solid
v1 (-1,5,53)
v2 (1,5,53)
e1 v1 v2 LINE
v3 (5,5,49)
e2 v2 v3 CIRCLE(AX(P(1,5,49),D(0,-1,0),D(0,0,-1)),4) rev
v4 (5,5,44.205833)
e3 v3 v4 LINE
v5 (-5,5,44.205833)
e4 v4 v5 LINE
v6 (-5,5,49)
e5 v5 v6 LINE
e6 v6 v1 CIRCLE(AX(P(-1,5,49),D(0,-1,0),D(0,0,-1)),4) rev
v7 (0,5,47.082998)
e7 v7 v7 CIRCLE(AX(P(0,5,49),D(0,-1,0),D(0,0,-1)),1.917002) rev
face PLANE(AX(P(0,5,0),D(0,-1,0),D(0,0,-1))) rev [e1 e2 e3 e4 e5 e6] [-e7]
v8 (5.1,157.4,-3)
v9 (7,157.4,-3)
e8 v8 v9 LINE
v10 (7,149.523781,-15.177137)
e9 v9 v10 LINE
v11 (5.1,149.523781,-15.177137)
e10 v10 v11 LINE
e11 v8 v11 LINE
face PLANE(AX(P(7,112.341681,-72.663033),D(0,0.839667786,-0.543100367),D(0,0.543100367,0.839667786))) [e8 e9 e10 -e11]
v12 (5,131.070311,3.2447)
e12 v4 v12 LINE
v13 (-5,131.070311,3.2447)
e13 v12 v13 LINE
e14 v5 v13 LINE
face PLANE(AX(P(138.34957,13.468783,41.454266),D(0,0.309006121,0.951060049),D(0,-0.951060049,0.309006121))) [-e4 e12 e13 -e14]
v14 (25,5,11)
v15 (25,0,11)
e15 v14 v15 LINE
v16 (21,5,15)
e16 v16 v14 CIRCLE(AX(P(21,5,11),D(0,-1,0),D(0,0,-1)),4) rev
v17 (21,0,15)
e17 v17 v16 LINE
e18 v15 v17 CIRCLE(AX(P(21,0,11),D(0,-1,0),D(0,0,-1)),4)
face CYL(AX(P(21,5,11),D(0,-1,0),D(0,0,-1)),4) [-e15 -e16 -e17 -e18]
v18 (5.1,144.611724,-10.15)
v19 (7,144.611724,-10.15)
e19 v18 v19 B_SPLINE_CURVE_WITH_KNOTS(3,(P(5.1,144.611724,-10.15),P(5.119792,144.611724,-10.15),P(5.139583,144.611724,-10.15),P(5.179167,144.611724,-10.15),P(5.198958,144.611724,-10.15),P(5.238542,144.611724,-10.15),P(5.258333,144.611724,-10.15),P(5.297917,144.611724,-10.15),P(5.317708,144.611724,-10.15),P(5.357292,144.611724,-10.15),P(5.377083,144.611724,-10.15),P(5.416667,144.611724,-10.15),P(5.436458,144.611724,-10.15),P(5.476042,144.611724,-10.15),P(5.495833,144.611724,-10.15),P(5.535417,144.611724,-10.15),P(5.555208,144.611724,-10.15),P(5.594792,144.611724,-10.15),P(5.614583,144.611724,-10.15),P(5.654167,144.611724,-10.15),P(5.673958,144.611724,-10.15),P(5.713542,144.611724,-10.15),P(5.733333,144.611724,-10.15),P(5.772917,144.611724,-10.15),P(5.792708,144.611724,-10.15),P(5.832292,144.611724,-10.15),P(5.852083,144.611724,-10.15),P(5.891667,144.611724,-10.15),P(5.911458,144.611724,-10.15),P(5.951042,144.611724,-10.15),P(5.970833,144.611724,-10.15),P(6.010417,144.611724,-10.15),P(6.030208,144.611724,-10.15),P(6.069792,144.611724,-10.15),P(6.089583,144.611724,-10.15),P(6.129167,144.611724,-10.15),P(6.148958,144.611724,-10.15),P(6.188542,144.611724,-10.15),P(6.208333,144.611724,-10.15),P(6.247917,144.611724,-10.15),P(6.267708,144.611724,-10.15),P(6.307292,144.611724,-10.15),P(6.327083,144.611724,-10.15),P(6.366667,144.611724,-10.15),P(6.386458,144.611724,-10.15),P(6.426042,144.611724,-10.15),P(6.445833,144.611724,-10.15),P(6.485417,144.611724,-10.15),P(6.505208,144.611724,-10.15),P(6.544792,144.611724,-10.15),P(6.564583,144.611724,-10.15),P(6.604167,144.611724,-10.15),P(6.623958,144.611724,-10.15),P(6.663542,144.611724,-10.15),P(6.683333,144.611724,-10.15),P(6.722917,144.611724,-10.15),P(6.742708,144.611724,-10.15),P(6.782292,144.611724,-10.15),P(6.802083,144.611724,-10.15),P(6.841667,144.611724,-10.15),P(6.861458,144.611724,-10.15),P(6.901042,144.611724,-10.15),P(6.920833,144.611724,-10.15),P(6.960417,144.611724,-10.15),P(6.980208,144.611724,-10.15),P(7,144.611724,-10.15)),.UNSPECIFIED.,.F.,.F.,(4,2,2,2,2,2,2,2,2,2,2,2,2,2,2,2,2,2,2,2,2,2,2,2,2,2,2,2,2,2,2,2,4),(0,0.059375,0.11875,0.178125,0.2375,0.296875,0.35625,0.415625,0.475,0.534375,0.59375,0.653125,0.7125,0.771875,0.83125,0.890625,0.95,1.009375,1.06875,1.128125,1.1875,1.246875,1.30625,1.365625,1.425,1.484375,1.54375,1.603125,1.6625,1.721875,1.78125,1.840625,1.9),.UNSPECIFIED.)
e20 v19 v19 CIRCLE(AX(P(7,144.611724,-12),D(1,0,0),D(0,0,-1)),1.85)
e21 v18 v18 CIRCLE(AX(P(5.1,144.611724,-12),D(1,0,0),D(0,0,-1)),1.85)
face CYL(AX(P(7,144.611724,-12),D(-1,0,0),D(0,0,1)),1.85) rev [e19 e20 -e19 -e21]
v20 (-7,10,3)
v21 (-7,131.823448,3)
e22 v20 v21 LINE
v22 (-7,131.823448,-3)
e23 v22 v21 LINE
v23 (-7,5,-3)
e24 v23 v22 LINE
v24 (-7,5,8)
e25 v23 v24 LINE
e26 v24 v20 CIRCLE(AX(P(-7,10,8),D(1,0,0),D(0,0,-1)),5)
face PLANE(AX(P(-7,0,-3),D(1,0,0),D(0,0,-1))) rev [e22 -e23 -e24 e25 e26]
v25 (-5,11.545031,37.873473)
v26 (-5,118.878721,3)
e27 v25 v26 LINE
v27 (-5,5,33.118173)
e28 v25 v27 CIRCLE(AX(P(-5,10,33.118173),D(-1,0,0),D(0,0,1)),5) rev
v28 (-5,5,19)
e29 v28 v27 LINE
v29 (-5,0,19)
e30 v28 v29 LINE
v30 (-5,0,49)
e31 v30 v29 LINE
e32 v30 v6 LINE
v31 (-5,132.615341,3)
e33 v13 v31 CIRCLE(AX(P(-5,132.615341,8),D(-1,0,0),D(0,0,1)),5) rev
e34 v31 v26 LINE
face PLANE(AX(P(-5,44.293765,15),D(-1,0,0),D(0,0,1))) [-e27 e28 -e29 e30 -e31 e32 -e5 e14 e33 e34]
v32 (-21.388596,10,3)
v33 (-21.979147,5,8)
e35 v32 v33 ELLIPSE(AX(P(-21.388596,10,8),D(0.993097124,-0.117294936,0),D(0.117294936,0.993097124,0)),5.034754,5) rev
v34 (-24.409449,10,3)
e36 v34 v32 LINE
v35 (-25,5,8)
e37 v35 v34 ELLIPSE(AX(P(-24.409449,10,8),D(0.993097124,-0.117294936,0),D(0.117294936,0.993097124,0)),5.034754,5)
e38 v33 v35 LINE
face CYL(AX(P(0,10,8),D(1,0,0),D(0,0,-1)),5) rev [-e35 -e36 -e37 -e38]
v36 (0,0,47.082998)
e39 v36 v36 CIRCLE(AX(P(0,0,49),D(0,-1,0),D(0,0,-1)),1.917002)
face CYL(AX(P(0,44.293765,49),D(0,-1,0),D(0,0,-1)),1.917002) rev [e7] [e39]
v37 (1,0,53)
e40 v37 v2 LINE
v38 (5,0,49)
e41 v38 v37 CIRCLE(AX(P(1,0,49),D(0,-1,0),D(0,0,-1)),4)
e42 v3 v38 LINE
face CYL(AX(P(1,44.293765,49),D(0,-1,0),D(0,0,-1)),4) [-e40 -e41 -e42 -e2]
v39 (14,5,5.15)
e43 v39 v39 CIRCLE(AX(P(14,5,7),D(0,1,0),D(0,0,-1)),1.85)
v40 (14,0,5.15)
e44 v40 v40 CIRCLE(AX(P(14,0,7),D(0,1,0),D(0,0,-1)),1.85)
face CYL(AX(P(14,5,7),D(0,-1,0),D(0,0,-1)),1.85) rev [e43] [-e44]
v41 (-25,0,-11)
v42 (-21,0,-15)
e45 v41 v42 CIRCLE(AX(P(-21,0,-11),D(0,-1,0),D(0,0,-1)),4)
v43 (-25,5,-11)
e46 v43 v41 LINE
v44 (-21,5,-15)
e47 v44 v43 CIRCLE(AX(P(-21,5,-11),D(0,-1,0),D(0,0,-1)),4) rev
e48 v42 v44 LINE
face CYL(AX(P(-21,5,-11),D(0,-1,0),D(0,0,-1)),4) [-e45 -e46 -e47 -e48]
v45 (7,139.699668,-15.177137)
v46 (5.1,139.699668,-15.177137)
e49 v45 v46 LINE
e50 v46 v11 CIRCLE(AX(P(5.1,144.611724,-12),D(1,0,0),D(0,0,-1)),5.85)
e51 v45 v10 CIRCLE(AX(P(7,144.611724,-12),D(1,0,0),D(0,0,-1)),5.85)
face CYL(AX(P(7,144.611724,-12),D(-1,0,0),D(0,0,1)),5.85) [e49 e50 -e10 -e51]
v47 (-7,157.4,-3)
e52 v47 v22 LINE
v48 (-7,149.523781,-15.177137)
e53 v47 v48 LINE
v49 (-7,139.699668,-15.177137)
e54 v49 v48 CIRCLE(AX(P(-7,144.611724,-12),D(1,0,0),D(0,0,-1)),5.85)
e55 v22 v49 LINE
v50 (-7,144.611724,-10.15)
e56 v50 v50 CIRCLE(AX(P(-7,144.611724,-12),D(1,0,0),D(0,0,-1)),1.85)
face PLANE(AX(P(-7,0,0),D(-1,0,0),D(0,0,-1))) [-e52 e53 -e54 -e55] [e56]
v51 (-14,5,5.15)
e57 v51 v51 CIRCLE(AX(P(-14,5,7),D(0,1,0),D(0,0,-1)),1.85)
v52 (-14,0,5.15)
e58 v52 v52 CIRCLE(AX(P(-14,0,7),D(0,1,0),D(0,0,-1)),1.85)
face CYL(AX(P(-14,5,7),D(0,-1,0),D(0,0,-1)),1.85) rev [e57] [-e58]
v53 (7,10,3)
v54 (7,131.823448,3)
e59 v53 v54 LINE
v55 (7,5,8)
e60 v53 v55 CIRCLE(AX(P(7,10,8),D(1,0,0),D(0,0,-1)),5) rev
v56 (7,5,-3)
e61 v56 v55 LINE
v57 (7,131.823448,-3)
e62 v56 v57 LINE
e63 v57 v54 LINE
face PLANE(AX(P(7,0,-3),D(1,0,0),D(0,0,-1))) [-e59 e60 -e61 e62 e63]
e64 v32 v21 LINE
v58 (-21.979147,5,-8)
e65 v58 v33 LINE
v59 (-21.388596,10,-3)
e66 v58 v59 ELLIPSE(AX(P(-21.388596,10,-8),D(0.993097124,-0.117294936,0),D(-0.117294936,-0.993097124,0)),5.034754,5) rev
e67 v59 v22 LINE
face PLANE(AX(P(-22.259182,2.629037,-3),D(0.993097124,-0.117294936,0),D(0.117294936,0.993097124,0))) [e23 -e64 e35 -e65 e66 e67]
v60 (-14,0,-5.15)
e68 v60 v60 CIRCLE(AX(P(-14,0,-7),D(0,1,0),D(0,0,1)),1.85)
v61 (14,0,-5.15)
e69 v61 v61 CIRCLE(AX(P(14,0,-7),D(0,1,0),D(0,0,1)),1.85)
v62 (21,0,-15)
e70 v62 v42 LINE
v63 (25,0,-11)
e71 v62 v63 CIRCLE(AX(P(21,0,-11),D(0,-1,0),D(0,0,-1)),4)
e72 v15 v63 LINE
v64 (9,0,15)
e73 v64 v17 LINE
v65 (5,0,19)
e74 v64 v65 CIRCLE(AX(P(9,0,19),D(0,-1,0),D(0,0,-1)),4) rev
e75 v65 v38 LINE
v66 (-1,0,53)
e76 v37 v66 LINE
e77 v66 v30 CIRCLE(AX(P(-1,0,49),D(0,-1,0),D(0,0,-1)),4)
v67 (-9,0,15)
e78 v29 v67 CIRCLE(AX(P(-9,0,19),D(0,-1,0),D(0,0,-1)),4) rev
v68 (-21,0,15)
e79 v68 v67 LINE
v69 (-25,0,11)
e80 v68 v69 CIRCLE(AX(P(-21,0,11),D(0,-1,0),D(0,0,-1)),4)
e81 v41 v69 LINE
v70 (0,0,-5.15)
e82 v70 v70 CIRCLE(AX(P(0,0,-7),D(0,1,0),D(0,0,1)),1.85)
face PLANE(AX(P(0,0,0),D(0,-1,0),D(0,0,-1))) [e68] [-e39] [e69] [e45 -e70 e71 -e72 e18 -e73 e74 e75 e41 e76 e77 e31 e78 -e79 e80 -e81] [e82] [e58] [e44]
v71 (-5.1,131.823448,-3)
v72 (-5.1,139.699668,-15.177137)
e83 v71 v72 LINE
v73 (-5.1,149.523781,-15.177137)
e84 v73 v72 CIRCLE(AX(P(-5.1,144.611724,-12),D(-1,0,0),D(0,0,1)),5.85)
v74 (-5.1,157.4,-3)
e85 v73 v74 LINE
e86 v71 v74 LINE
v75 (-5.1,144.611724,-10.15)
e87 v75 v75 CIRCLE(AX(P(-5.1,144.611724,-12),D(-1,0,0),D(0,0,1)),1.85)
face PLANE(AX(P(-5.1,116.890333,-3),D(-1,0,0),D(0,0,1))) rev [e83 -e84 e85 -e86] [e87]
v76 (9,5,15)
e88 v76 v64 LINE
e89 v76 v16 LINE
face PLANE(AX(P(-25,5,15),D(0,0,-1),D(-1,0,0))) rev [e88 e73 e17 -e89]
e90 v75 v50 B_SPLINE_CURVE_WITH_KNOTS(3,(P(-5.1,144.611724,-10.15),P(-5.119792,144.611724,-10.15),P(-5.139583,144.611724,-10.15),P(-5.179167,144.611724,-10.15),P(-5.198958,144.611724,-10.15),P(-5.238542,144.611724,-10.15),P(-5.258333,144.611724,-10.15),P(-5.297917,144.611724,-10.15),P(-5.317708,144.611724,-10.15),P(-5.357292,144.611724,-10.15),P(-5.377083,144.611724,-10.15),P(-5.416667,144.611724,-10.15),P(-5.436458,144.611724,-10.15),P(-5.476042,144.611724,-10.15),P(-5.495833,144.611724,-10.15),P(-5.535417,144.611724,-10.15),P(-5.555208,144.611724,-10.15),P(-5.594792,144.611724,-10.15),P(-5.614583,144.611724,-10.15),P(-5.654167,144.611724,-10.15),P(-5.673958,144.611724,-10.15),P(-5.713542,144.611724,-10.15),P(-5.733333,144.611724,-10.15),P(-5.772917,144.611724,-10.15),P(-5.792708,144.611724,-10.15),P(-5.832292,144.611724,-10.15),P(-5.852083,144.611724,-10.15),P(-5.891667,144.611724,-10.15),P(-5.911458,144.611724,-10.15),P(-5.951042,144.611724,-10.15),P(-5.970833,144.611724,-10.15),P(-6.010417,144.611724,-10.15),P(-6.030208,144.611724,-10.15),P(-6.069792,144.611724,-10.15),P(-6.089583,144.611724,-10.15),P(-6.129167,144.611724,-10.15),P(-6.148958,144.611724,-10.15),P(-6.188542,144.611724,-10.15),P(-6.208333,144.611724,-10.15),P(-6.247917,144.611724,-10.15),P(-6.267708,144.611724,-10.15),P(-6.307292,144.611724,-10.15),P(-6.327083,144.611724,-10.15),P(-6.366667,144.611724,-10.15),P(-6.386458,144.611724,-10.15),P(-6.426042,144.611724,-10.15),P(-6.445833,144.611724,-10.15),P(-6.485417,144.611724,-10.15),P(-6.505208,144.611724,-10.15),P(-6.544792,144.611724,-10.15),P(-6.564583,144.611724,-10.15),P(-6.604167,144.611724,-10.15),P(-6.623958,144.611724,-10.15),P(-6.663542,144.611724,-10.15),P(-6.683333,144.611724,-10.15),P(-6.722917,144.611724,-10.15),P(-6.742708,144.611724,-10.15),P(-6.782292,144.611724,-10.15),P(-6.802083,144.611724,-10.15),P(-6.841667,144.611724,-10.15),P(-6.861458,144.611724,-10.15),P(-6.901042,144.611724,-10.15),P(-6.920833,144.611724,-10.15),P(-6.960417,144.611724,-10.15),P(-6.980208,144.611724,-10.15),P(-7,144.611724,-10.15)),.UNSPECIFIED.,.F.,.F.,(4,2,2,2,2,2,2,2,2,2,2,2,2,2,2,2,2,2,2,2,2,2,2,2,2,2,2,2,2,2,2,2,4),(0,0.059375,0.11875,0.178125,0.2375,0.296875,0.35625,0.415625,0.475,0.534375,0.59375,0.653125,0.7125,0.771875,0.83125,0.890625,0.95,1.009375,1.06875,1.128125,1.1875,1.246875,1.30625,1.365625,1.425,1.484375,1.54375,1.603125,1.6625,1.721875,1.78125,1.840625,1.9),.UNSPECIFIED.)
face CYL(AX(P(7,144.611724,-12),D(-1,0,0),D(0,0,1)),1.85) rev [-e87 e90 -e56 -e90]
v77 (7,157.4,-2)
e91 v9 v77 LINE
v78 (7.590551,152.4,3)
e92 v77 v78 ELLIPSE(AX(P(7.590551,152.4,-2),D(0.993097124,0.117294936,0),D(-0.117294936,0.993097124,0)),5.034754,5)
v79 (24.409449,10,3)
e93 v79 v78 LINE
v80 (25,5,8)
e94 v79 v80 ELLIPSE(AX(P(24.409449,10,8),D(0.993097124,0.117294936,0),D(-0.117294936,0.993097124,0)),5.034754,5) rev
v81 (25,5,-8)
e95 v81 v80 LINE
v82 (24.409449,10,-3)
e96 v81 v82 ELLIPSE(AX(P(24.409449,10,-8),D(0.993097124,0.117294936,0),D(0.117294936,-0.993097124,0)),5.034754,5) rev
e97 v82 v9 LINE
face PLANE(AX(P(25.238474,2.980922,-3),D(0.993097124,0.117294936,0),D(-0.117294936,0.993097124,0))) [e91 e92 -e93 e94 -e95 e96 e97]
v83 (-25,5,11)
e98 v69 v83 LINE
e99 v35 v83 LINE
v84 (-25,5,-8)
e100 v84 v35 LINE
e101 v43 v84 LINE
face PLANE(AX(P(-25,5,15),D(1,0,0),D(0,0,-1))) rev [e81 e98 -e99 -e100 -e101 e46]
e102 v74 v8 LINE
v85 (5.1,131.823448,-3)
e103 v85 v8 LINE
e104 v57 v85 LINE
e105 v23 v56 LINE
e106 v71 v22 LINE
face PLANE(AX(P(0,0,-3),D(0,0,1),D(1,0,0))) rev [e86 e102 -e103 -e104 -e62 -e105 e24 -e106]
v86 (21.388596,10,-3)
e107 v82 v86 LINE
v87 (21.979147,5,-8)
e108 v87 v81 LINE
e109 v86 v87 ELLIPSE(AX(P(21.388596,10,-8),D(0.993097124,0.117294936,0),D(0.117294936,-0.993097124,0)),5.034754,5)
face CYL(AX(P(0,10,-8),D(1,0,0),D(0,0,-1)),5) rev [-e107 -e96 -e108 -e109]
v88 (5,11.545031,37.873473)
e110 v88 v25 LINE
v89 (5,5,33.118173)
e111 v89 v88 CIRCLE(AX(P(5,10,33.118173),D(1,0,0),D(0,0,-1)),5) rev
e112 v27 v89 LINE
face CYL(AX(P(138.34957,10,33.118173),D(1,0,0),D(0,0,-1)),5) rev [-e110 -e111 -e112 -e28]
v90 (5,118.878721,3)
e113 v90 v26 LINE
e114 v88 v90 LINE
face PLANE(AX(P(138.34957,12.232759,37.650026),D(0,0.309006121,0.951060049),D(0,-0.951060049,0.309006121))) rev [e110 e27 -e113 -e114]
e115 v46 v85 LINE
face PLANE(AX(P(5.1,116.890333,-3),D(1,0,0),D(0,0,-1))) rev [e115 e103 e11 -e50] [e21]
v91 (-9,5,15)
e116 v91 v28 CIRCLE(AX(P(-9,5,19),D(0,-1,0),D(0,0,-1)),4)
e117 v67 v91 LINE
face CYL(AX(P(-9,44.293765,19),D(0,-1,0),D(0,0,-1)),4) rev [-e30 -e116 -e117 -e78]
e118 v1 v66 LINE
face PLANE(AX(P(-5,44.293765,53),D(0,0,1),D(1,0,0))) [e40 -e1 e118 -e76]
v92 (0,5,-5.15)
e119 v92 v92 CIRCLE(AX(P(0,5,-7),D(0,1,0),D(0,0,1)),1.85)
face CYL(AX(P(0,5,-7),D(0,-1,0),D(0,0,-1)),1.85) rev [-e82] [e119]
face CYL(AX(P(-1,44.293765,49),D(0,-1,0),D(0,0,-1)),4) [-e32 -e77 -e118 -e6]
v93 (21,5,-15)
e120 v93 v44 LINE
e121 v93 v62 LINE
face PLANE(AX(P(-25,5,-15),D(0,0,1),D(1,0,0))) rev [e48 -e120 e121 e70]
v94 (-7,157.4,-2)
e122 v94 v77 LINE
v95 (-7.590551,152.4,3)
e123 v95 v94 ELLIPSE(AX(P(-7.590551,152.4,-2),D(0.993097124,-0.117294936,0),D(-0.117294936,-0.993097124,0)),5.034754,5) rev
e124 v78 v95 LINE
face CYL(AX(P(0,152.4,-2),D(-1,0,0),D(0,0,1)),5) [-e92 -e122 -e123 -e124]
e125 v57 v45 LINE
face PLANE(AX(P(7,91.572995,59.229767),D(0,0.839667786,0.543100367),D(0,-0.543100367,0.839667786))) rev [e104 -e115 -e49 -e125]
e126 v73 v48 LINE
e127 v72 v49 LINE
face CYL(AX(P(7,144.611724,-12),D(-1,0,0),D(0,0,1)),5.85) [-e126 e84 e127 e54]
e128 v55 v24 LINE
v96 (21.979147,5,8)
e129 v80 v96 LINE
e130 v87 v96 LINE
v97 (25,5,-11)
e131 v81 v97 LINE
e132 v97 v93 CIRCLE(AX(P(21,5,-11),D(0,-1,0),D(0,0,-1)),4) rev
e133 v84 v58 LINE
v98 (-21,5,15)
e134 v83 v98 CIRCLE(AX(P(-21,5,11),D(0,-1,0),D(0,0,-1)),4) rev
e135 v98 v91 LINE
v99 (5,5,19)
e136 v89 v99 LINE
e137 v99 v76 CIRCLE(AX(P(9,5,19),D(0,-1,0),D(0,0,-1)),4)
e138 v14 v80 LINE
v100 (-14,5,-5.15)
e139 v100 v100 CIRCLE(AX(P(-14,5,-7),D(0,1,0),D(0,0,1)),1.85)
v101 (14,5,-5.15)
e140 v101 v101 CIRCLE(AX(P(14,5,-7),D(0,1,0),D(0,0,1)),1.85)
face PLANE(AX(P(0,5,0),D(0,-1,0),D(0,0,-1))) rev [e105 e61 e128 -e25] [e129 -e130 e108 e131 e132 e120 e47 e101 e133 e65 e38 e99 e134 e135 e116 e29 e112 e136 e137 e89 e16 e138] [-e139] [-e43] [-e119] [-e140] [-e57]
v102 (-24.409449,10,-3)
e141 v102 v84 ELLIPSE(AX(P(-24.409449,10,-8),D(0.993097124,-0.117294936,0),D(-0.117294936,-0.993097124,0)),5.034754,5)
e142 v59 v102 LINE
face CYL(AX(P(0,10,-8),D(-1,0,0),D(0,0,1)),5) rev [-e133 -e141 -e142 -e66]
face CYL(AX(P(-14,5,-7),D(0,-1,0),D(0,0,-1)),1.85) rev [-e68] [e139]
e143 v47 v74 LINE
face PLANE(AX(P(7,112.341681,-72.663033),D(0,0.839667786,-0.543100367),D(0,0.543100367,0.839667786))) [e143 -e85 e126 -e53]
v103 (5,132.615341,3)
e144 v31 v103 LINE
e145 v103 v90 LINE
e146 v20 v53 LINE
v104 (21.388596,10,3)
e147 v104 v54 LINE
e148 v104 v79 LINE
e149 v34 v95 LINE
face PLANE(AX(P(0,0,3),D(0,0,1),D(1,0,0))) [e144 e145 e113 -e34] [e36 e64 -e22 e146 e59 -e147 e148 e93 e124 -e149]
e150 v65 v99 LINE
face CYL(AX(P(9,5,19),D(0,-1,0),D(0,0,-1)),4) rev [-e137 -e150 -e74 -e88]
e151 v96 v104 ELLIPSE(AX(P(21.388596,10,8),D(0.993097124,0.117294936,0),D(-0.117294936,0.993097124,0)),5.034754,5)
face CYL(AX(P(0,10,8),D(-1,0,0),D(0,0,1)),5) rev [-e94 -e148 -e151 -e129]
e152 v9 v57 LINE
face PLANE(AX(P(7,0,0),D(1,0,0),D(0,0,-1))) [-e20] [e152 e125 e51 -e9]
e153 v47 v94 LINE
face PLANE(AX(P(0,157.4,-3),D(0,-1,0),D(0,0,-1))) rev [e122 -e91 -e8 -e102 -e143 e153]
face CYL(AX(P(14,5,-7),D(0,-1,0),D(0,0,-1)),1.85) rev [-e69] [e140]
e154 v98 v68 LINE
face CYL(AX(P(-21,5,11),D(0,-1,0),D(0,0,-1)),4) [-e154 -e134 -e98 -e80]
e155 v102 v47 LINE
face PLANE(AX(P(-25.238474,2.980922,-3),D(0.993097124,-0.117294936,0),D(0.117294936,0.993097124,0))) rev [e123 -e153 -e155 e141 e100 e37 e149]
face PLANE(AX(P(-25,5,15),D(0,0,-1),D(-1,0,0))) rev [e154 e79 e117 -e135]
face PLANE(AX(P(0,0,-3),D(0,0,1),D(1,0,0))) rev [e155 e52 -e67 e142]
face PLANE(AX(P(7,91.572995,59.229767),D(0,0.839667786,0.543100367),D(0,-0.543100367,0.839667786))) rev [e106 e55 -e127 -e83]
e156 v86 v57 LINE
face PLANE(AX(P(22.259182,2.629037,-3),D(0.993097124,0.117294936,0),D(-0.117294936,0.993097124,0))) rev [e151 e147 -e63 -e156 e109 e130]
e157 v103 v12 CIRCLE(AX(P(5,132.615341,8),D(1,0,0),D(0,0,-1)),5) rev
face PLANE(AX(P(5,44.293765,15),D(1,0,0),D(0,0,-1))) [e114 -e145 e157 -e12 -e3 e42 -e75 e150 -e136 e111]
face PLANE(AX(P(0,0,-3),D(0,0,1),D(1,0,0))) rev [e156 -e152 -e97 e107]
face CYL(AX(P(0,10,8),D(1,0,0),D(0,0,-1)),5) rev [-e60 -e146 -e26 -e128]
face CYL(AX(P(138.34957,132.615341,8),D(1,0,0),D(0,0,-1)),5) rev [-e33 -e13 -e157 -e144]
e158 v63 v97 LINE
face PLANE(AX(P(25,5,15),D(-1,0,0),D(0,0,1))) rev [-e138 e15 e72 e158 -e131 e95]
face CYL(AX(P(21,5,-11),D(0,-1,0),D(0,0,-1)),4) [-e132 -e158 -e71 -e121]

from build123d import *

# Parameters (mm, degrees)
SKETCH1_W                       = 50
SKETCH1_H                       = 30
SKETCH1_R                       = 1.85
BOSS_EXTRUDE1_DEPTH             = 5
BOSS_EXTRUDE2_DEPTH             = 3
BOSS_EXTRUDE2_DEPTH_BACK        = 3
SKETCH4_R                       = 1.85
BOSS_EXTRUDE3_DEPTH             = 7
CUT_EXTRUDE1_REACH              = 162.37
SKETCH6_W                       = 10.2
SKETCH6_H                       = 14.85
SKETCH8_R                       = 1.85
SKETCH8_W                       = 10
SKETCH8_H                       = 38
SKETCH8_R_2                     = 1.917002372
BOSS_EXTRUDE4_DEPTH             = 5
BOSS_EXTRUDE5_REACH             = 169.955
BOSS_EXTRUDE5_DIRECTION_2_REACH = 169.955
FILLET1_R                       = 5
FILLET2_R                       = 4


with BuildPart() as part:
    # Sketch1 → Boss-Extrude1 (new body)
    with BuildSketch(Plane(origin=(0, 0, 0), x_dir=(1, 0, 0), z_dir=(0, 1, 0))):
        Rectangle(SKETCH1_W, SKETCH1_H)
        with Locations(Location((0, 7, 0), (0, 0, 270))):
            Circle(SKETCH1_R, mode=Mode.SUBTRACT)
        with Locations(Location((14, 7, 0), (0, 0, 270))):
            Circle(SKETCH1_R, mode=Mode.SUBTRACT)
        with Locations(Location((-14, 7, 0), (0, 0, 270))):
            Circle(SKETCH1_R, mode=Mode.SUBTRACT)
        with Locations(Location((14, -7, 0), (0, 0, 90))):
            Circle(SKETCH1_R, mode=Mode.SUBTRACT)
        with Locations(Location((0, -7, 0), (0, 0, 90))):
            Circle(SKETCH1_R, mode=Mode.SUBTRACT)
        with Locations(Location((-14, -7, 0), (0, 0, 90))):
            Circle(SKETCH1_R, mode=Mode.SUBTRACT)
    extrude(amount=BOSS_EXTRUDE1_DEPTH)

    # Sketch3 → Boss-Extrude2 (add, two sides: drawn at the far end of the back side and taken through both)
    with BuildSketch(Plane.XY.offset(-BOSS_EXTRUDE2_DEPTH_BACK)):
        Polygon((-7, 157.4), (-25, 5), (-21.97914743, 5), (-7, 131.823448239), align=None)
        Polygon((25, 5), (7, 157.4), (7, 131.823448239), (21.97914743, 5), align=None)
        Polygon((0, 157.4), (-7, 157.4), (-7, 131.823448239), (-7, 5), (0, 5), align=None)
        Polygon((7, 157.4), (0, 157.4), (0, 5), (7, 5), (7, 131.823448239), align=None)
    extrude(amount=BOSS_EXTRUDE2_DEPTH + BOSS_EXTRUDE2_DEPTH_BACK)

    # Sketch4 → Boss-Extrude3 (add)
    with BuildSketch(Plane(origin=(0, 0, 0), x_dir=(0, 0, -1), z_dir=(1, 0, 0))):
        with BuildLine():
            Line((3, 131.823448239), (15.177137146, 139.699667569))
            ThreePointArc((15.177137146, 139.699667569), (17.85, 144.611724119), (15.177137146, 149.52378067))
            Line((15.177137146, 149.52378067), (3, 157.4))
            Line((3, 157.4), (3, 131.823448239))
        make_face()
        with Locations(Location((12, 144.611724119, 0), (0, 0, 180))):
            Circle(SKETCH4_R, mode=Mode.SUBTRACT)
    boss_extrude3 = extrude(amount=BOSS_EXTRUDE3_DEPTH)

    # Mirror1: Boss-Extrude3 across plane
    add(boss_extrude3.mirror(Plane(origin=(0, 0, 0), x_dir=(0, 0, 1), z_dir=(1, 0, 0))))

    # Cut-Extrude1: up to this plane
    cut_extrude1_end = Plane(origin=(7, 91.572994836, 59.229766685), z_dir=(0, 0.8396677864426271, 0.5431003667928599))
    # Sketch6 → Cut-Extrude1 (cut, up to the surface)
    with BuildSketch(Plane(origin=(0, 157.4, 0), x_dir=(1, 0, 0), z_dir=(0, 1, 0)), mode=Mode.PRIVATE) as cut_extrude1_sk1:
        with Locations((0, 10.425)):
            Rectangle(SKETCH6_W, SKETCH6_H)
    cut_extrude1_tool1 = split(extrude(cut_extrude1_sk1.sketch, amount=-CUT_EXTRUDE1_REACH, mode=Mode.PRIVATE), bisect_by=cut_extrude1_end, keep=Keep.BOTH, mode=Mode.PRIVATE)
    add(cut_extrude1_tool1.solids().sort_by_distance((0, 157.4, -10.425))[0], mode=Mode.SUBTRACT)

    # Sketch8 → Boss-Extrude4 (add)
    # profile 1 of 2: a face of its own
    with BuildSketch(Plane.XZ):
        with Locations((0, 7)):
            Circle(SKETCH8_R)
    # profile 2 of 2: a face of its own
    with BuildSketch(Plane.XZ):
        with Locations((0, 34)):
            Rectangle(SKETCH8_W, SKETCH8_H)
        with Locations(Location((0, 49, 0), (0, 0, 270))):
            Circle(SKETCH8_R_2, mode=Mode.SUBTRACT)
    extrude(amount=-BOSS_EXTRUDE4_DEPTH)

    # Boss-Extrude5: up to this face of the body (flat: up to its plane)
    boss_extrude5_end = Plane(part.part.faces().sort_by_distance((5, 2.5, 34))[0])
    # Sketch9 → Boss-Extrude5 (add, up to the picked face)
    with BuildSketch(Plane(origin=(0, 0, 0), x_dir=(0, 0, -1), z_dir=(1, 0, 0)), mode=Mode.PRIVATE) as boss_extrude5_sk1:
        Polygon((-3, 131.823448239), (-44.205833274, 5), (-40, 5), (-3, 118.878720851), align=None)
    boss_extrude5_tool1 = split(extrude(boss_extrude5_sk1.sketch, amount=BOSS_EXTRUDE5_REACH, mode=Mode.PRIVATE), bisect_by=boss_extrude5_end, keep=Keep.BOTH, mode=Mode.PRIVATE)
    add(boss_extrude5_tool1.solids().sort_by(Axis((0, 65.233555, 22.570307), (1, 0, 0)))[0])

    # Boss-Extrude5 direction 2: up to this face of the body (flat: up to its plane)
    boss_extrude5_direction_2_end = Plane(part.part.faces().sort_by_distance((-5, 2.5, 34))[0])
    # Sketch9 → Boss-Extrude5 direction 2 (add, up to the picked face)
    with BuildSketch(Plane(origin=(0, 0, 0), x_dir=(0, 0, -1), z_dir=(1, 0, 0)), mode=Mode.PRIVATE) as boss_extrude5_direction_2_sk1:
        Polygon((-3, 131.823448239), (-44.205833274, 5), (-40, 5), (-3, 118.878720851), align=None)
    boss_extrude5_direction_2_tool1 = split(extrude(boss_extrude5_direction_2_sk1.sketch, amount=-BOSS_EXTRUDE5_DIRECTION_2_REACH, mode=Mode.PRIVATE), bisect_by=boss_extrude5_direction_2_end, keep=Keep.BOTH, mode=Mode.PRIVATE)
    add(boss_extrude5_direction_2_tool1.solids().sort_by(Axis((0, 65.233555, 22.570307), (-1, 0, 0)))[0])

    # Fillet1
    # the kernel refuses this fillet: 5 mm, written as the material it adds along each edge
    with BuildSketch(Plane(origin=(-5, 131.823448239, 3), x_dir=(0, -0.9510600491338266, 0.3090061212040359), z_dir=(1, 0, 0))) as fillet1_piece_1:
        with BuildLine():
            CenterArc((FILLET1_R * 0.158378580578, -FILLET1_R), FILLET1_R, 90, 17.999344954)
            Line((-FILLET1_R * 0.150627540626, -FILLET1_R * 0.0489399508662), (0, 0))
            Line((0, 0), (FILLET1_R * 0.158378580578, 0))
        make_face()
    extrude(amount=10)
    with BuildSketch(Plane(origin=(-5, 5, 40), x_dir=(0, 0.9510600491338281, -0.3090061212040312), z_dir=(1, 0, 0))) as fillet1_piece_2:
        with BuildLine():
            CenterArc((FILLET1_R * 1.37636537503, -FILLET1_R), FILLET1_R, 90, 107.999344954)
            Line((FILLET1_R * 0.425305325898, -FILLET1_R * 1.3090061212), (0, 0))
            Line((0, 0), (FILLET1_R * 1.37636537503, 0))
        make_face()
    extrude(amount=10)
    with BuildSketch(Plane(origin=(9.47914743, 5, 3), x_dir=(0, 1, 0), z_dir=(1, 0, 0))) as fillet1_piece_3_section:
        with BuildLine():
            CenterArc((FILLET1_R, FILLET1_R), FILLET1_R, 180, 90)
            Line((0, FILLET1_R), (0, 0))
            Line((0, 0), (FILLET1_R, 0))
        make_face()
    fillet1_piece_3 = extrude(amount=15.52085257, mode=Mode.PRIVATE)
    fillet1_piece_3 = split(fillet1_piece_3, bisect_by=Plane(origin=(21.86620474, 5.956248104, 4.13176941), z_dir=(0.9930971241558421, 0.11729493592391835, 0)), keep=Keep.TOP, mode=Mode.PRIVATE)
    fillet1_piece_3 = split(fillet1_piece_3, bisect_by=Plane(origin=(24.845496113, 6.308132911, 4.13176941), z_dir=(-0.9930971241558421, -0.11729493592391835, 0)), keep=Keep.TOP, mode=Mode.PRIVATE)
    add(fillet1_piece_3)
    with BuildSketch(Plane(origin=(-25, 5, -3), x_dir=(0, 1, 0), z_dir=(1, 0, 0))) as fillet1_piece_4_section:
        with BuildLine():
            CenterArc((FILLET1_R, -FILLET1_R), FILLET1_R, 90, 90)
            Line((0, -FILLET1_R), (0, 0))
            Line((0, 0), (FILLET1_R, 0))
        make_face()
    fillet1_piece_4 = extrude(amount=15.52085257, mode=Mode.PRIVATE)
    fillet1_piece_4 = split(fillet1_piece_4, bisect_by=Plane(origin=(-24.845496113, 6.308132911, -4.13176941), z_dir=(0.9930971241558421, -0.11729493592391835, 0)), keep=Keep.TOP, mode=Mode.PRIVATE)
    fillet1_piece_4 = split(fillet1_piece_4, bisect_by=Plane(origin=(-21.86620474, 5.956248104, -4.13176941), z_dir=(-0.9930971241558421, 0.11729493592391835, 0)), keep=Keep.TOP, mode=Mode.PRIVATE)
    add(fillet1_piece_4)
    with BuildSketch(Plane(origin=(9.47914743, 5, -3), x_dir=(0, 1, 0), z_dir=(1, 0, 0))) as fillet1_piece_5_section:
        with BuildLine():
            CenterArc((FILLET1_R, -FILLET1_R), FILLET1_R, 90, 90)
            Line((0, -FILLET1_R), (0, 0))
            Line((0, 0), (FILLET1_R, 0))
        make_face()
    fillet1_piece_5 = extrude(amount=15.52085257, mode=Mode.PRIVATE)
    fillet1_piece_5 = split(fillet1_piece_5, bisect_by=Plane(origin=(24.845496113, 6.308132911, -4.13176941), z_dir=(-0.9930971241558421, -0.11729493592391835, 0)), keep=Keep.TOP, mode=Mode.PRIVATE)
    fillet1_piece_5 = split(fillet1_piece_5, bisect_by=Plane(origin=(21.86620474, 5.956248104, -4.13176941), z_dir=(0.9930971241558421, 0.11729493592391835, 0)), keep=Keep.TOP, mode=Mode.PRIVATE)
    add(fillet1_piece_5)
    with BuildSketch(Plane(origin=(-25, 5, 3), x_dir=(0, 1, 0), z_dir=(1, 0, 0))) as fillet1_piece_6_section:
        with BuildLine():
            CenterArc((FILLET1_R, FILLET1_R), FILLET1_R, 180, 90)
            Line((0, FILLET1_R), (0, 0))
            Line((0, 0), (FILLET1_R, 0))
        make_face()
    fillet1_piece_6 = extrude(amount=15.52085257, mode=Mode.PRIVATE)
    fillet1_piece_6 = split(fillet1_piece_6, bisect_by=Plane(origin=(-24.845496113, 6.308132911, 4.13176941), z_dir=(0.9930971241558421, -0.11729493592391835, 0)), keep=Keep.TOP, mode=Mode.PRIVATE)
    fillet1_piece_6 = split(fillet1_piece_6, bisect_by=Plane(origin=(-21.86620474, 5.956248104, 4.13176941), z_dir=(-0.9930971241558421, 0.11729493592391835, 0)), keep=Keep.TOP, mode=Mode.PRIVATE)
    add(fillet1_piece_6)
    with BuildSketch(Plane(origin=(-7, 5, 3), x_dir=(0, 1, 0), z_dir=(1, 0, 0))) as fillet1_piece_7:
        with BuildLine():
            CenterArc((FILLET1_R, FILLET1_R), FILLET1_R, 180, 90)
            Line((0, FILLET1_R), (0, 0))
            Line((0, 0), (FILLET1_R, 0))
        make_face()
    extrude(amount=14)
    # the kernel refuses this fillet: 5 mm, written as the material it takes off along each edge
    with BuildSketch(Plane(origin=(-19.5, 157.4, 3), x_dir=(0, -1, 0), z_dir=(1, 0, 0))) as fillet1_2_piece_1:
        with BuildLine():
            CenterArc((FILLET1_R, FILLET1_R), FILLET1_R, 180, 90)
            Line((0, FILLET1_R), (0, 0))
            Line((0, 0), (FILLET1_R, 0))
        make_face()
    extrude(amount=39, mode=Mode.SUBTRACT)

    # Fillet2
    fillet2_edges = [part.edges().sort_by_distance(p)[0] for p in [
        (5, 2.5, 15),
        (5, 2.5, 53),
        (-5, 2.5, 53),
        (-5, 2.5, 15),
        (25, 2.5, 15),
        (-25, 2.5, 15),
        (-25, 2.5, -15),
        (25, 2.5, -15),
    ]]
    fillet(fillet2_edges, radius=FILLET2_R)


solid = part.part
